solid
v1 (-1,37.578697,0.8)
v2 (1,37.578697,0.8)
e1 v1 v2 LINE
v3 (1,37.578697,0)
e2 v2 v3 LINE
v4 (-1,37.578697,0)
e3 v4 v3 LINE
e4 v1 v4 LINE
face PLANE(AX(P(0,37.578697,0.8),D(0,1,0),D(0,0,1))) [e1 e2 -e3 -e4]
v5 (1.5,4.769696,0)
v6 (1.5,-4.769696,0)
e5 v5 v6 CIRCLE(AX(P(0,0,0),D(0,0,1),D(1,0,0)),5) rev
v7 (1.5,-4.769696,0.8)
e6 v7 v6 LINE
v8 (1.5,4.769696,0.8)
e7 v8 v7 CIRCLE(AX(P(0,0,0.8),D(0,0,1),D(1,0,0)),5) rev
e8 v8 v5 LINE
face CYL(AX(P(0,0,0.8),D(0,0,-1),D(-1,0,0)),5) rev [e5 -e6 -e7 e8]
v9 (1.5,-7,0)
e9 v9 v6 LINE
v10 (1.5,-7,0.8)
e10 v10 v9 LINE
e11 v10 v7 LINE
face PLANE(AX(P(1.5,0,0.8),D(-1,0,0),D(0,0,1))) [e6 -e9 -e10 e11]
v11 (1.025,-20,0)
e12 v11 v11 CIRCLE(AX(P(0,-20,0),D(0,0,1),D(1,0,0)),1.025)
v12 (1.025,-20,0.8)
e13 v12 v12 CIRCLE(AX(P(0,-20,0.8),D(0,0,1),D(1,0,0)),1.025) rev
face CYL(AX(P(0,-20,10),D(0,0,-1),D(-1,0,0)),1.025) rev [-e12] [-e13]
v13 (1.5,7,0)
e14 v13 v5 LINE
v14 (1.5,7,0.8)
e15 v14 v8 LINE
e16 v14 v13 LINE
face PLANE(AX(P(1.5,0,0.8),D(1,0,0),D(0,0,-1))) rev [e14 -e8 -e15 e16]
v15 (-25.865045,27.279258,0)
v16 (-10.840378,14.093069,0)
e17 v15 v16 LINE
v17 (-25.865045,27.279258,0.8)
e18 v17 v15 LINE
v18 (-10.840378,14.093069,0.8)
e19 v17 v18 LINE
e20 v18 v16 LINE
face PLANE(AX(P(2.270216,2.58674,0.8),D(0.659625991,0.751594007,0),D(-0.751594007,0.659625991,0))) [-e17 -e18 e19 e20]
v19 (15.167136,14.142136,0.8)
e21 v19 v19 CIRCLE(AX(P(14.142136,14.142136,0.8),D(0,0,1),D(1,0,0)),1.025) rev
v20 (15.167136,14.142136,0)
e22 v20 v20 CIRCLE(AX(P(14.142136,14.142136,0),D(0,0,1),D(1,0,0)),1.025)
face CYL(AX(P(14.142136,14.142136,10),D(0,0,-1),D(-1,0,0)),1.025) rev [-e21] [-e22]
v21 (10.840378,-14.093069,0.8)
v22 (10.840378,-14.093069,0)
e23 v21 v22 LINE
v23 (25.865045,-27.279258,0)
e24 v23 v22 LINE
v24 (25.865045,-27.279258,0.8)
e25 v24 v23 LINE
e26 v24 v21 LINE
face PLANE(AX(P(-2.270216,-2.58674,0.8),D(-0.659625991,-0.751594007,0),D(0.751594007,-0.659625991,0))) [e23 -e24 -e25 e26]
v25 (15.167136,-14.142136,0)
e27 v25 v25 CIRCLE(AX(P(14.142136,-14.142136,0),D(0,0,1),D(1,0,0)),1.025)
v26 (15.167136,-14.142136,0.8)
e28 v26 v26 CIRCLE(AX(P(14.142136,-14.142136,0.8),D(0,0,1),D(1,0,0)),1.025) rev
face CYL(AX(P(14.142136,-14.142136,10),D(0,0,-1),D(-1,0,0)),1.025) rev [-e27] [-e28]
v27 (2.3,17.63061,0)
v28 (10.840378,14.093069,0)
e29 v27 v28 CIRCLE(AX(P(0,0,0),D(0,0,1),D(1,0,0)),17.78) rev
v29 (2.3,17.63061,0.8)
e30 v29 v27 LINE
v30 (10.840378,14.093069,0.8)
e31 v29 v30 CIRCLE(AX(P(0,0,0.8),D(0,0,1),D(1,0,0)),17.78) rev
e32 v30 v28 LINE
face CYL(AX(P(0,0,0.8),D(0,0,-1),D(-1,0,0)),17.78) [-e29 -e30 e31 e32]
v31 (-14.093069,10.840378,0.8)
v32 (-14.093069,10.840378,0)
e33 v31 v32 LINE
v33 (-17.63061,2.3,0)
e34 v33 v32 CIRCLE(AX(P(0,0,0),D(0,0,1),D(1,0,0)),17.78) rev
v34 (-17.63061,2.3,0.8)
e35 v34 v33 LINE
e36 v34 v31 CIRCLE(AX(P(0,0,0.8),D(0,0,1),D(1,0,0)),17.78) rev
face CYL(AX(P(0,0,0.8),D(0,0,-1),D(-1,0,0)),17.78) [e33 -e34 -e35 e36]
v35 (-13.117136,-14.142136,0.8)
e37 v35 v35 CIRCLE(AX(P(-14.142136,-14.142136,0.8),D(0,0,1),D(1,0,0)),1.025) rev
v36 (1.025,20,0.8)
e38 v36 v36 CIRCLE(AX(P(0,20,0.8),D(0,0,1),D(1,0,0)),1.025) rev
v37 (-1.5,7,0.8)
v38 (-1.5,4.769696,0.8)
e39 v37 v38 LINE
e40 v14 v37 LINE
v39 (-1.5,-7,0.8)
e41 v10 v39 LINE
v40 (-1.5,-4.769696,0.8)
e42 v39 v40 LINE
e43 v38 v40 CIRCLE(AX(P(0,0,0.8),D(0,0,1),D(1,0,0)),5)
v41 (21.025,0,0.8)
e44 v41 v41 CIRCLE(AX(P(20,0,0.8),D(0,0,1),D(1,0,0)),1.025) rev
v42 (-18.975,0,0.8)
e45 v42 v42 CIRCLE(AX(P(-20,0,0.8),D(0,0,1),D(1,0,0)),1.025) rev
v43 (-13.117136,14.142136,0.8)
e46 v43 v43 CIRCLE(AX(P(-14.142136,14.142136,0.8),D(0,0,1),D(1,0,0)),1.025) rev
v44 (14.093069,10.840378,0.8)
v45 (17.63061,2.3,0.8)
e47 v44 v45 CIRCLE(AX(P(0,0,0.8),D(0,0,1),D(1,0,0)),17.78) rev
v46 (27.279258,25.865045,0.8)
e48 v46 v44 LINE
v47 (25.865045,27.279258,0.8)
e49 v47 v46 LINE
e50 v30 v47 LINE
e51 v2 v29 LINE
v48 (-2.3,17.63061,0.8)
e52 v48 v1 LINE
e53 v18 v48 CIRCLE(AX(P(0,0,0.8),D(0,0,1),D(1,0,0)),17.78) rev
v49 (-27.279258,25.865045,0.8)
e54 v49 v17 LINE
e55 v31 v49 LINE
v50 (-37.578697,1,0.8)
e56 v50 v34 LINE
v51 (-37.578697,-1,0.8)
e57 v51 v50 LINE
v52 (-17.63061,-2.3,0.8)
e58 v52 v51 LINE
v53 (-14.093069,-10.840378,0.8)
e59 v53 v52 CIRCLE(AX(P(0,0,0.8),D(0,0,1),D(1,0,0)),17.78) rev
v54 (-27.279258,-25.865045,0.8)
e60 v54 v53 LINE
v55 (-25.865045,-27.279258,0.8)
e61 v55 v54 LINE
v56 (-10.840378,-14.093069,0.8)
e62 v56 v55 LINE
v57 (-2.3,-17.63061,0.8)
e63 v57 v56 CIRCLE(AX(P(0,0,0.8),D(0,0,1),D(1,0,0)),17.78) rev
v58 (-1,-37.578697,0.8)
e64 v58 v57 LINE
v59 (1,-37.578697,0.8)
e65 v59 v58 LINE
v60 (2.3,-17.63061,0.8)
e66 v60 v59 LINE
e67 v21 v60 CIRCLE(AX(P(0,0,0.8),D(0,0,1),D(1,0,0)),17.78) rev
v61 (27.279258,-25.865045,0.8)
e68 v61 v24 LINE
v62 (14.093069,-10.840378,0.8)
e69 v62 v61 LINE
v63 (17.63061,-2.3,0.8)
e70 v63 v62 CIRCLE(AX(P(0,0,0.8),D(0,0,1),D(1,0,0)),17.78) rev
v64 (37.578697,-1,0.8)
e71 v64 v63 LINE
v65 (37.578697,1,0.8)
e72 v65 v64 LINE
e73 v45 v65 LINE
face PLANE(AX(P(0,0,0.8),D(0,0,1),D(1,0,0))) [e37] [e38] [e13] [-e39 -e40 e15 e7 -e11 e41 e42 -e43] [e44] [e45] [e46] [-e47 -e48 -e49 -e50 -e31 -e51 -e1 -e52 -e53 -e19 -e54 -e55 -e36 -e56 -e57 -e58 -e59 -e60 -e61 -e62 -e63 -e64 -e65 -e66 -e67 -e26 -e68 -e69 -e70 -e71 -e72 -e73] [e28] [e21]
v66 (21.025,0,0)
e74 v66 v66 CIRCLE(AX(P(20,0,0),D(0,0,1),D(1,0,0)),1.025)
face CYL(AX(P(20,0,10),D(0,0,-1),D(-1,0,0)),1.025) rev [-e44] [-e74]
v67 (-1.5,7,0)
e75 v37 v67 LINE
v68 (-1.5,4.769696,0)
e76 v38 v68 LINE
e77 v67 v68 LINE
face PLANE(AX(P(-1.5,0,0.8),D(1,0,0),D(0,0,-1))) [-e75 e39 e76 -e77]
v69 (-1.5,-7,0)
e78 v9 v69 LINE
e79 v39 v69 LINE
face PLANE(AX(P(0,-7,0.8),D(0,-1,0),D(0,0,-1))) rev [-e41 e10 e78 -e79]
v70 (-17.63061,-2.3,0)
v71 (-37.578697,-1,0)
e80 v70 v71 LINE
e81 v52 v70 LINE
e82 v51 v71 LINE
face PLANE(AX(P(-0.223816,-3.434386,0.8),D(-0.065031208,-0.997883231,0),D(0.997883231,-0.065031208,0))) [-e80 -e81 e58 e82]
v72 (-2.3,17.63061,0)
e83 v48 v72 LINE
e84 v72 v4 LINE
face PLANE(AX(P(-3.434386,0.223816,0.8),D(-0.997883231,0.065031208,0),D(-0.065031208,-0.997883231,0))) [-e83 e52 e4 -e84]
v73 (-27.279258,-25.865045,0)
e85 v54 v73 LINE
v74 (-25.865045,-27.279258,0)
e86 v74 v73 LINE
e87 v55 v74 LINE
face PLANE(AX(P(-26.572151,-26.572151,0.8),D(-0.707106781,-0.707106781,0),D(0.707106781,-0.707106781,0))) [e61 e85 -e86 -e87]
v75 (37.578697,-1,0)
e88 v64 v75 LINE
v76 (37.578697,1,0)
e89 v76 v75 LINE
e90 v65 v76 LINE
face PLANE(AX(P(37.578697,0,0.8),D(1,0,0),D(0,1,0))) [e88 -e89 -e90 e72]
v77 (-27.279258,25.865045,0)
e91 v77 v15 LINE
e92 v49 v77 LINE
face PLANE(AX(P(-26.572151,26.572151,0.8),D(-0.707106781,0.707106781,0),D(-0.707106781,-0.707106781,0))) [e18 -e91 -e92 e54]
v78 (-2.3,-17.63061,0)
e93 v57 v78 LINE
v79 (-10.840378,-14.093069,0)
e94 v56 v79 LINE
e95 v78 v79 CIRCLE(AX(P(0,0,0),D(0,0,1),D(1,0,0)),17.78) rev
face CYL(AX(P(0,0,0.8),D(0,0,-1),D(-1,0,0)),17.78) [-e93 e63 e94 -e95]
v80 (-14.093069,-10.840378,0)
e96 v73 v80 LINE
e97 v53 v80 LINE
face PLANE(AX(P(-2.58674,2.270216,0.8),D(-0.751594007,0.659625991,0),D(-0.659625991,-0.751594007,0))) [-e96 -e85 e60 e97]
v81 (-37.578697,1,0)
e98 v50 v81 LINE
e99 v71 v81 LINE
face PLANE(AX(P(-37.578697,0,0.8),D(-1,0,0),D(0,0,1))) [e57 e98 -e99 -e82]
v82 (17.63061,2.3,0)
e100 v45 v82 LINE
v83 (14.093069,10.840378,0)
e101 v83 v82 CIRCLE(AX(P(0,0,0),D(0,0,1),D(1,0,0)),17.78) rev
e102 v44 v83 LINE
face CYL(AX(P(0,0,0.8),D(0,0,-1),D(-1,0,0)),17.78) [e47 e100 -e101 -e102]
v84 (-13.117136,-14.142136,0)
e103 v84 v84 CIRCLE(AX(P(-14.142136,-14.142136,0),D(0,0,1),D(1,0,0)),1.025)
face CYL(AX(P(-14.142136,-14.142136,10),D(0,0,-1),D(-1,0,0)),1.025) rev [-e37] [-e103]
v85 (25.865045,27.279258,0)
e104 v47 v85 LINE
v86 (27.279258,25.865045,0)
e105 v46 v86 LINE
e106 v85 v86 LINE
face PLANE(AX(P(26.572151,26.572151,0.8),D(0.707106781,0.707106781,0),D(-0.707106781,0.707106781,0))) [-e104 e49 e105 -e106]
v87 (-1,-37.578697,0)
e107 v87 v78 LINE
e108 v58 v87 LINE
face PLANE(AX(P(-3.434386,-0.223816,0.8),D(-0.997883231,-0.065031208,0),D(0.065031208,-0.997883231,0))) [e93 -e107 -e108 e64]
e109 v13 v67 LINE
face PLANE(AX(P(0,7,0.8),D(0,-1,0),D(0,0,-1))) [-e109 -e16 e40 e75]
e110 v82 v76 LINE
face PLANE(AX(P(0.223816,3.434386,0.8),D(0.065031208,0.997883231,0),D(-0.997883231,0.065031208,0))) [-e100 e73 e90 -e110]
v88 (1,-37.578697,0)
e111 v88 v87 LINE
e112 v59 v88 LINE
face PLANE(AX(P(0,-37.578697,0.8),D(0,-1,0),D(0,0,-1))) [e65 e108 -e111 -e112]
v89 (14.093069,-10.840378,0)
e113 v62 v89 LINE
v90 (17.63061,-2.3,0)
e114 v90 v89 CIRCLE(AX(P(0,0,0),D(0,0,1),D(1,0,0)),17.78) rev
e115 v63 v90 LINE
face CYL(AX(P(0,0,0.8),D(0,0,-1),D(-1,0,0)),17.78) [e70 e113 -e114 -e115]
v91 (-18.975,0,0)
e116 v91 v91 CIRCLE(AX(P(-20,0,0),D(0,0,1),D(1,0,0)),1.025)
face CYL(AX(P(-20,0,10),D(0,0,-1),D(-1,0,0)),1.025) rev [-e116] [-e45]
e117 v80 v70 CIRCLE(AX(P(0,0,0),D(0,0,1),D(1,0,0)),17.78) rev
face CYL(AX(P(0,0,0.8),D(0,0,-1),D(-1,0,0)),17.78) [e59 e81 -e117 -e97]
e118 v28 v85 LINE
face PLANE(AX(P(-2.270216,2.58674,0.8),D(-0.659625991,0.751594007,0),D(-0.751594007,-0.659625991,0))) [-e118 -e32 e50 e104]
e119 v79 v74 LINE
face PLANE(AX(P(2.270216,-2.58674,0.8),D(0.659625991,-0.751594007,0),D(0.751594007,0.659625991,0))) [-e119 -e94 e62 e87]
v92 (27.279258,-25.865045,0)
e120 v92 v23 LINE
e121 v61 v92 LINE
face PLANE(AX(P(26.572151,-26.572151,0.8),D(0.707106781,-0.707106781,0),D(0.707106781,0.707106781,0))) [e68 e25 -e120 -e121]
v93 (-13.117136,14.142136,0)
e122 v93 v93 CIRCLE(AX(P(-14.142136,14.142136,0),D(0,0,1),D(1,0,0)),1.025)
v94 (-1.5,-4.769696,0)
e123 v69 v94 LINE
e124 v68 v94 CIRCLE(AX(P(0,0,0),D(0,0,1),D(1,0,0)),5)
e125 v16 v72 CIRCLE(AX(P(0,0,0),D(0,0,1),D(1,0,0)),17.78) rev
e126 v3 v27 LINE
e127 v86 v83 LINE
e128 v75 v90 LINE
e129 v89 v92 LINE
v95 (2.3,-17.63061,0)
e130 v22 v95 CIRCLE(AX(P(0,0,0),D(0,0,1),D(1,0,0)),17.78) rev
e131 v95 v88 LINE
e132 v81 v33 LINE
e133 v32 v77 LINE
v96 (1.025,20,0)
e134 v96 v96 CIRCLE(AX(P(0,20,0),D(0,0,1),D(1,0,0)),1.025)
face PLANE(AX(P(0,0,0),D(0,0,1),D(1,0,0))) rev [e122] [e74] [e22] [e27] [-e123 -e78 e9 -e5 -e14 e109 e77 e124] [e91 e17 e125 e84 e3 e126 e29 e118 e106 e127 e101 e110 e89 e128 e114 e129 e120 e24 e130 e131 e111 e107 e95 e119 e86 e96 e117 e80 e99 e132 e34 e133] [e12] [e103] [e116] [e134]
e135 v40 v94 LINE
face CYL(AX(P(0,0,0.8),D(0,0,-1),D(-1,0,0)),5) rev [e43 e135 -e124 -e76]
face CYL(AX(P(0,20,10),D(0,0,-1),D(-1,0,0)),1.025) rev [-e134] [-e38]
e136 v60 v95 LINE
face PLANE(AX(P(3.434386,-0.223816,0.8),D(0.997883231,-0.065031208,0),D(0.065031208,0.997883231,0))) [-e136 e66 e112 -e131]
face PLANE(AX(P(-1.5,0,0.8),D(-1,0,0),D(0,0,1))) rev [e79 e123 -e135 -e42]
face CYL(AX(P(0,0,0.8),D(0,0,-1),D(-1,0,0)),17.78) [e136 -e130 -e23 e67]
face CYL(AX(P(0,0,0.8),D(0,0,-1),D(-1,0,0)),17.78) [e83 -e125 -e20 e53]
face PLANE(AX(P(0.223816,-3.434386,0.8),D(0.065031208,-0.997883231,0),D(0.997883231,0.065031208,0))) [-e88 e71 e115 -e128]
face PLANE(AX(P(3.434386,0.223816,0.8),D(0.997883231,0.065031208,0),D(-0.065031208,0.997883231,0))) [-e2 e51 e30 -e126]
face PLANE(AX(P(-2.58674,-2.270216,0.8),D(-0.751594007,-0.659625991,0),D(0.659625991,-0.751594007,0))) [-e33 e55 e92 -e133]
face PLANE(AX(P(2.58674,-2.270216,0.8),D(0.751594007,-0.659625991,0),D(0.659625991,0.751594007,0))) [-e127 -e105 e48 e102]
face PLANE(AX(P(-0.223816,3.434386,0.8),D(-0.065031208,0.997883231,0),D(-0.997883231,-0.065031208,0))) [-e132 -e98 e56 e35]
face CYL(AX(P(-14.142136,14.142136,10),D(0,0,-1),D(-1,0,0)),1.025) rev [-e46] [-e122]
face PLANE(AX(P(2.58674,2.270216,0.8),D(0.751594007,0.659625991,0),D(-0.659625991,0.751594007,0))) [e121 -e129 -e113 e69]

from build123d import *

# Parameters (mm, degrees)
BOSS_EXTRUDE1_DEPTH = 0.8
SKETCH2_R           = 1.025
CUT_EXTRUDE2_DEPTH  = 10


# Read off the part's stored shape, not the designer's step: Boss-Extrude1
with BuildPart() as part:
    # Boss-Extrude1 outline → Boss-Extrude1 (new body)
    with BuildSketch(Plane.XY):
        with BuildLine():
            ThreePointArc((-2.3, 17.630609746), (-6.804111427, 16.426578088), (-10.840378111, 14.093069304))
            Line((-10.840378111, 14.093069304), (-25.865044656, 27.279258218))
            Line((-25.865044656, 27.279258218), (-27.279258218, 25.865044656))
            Line((-27.279258218, 25.865044656), (-14.093069304, 10.840378111))
            ThreePointArc((-14.093069304, 10.840378111), (-16.426578088, 6.804111427), (-17.630609746, 2.3))
            Line((-17.630609746, 2.3), (-37.578696944, 1))
            Line((-37.578696944, 1), (-37.578696944, -1))
            Line((-37.578696944, -1), (-17.630609746, -2.3))
            ThreePointArc((-17.630609746, -2.3), (-16.426578088, -6.804111427), (-14.093069304, -10.840378111))
            Line((-14.093069304, -10.840378111), (-27.279258218, -25.865044656))
            Line((-27.279258218, -25.865044656), (-25.865044656, -27.279258218))
            Line((-25.865044656, -27.279258218), (-10.840378111, -14.093069304))
            ThreePointArc((-10.840378111, -14.093069304), (-6.804111427, -16.426578088), (-2.3, -17.630609746))
            Line((-2.3, -17.630609746), (-1, -37.578696944))
            Line((-1, -37.578696944), (1, -37.578696944))
            Line((1, -37.578696944), (2.3, -17.630609746))
            ThreePointArc((2.3, -17.630609746), (6.804111427, -16.426578088), (10.840378111, -14.093069304))
            Line((10.840378111, -14.093069304), (25.865044656, -27.279258218))
            Line((25.865044656, -27.279258218), (27.279258218, -25.865044656))
            Line((27.279258218, -25.865044656), (14.093069304, -10.840378111))
            ThreePointArc((14.093069304, -10.840378111), (16.426578088, -6.804111427), (17.630609746, -2.3))
            Line((17.630609746, -2.3), (37.578696944, -1))
            Line((37.578696944, -1), (37.578696944, 1))
            Line((37.578696944, 1), (17.630609746, 2.3))
            ThreePointArc((17.630609746, 2.3), (16.426578088, 6.804111427), (14.093069304, 10.840378111))
            Line((14.093069304, 10.840378111), (27.279258218, 25.865044656))
            Line((27.279258218, 25.865044656), (25.865044656, 27.279258218))
            Line((25.865044656, 27.279258218), (10.840378111, 14.093069304))
            ThreePointArc((10.840378111, 14.093069304), (6.804111427, 16.426578088), (2.3, 17.630609746))
            Line((2.3, 17.630609746), (1, 37.578696944))
            Line((1, 37.578696944), (-1, 37.578696944))
            Line((-1, 37.578696944), (-2.3, 17.630609746))
        make_face()
        with BuildLine():
            Line((-1.5, -7), (-1.5, -4.769696007))
            ThreePointArc((-1.5, -4.769696007), (-5, 0), (-1.5, 4.769696007))
            Line((-1.5, 4.769696007), (-1.5, 7))
            Line((-1.5, 7), (1.5, 7))
            Line((1.5, 7), (1.5, 4.769696007))
            ThreePointArc((1.5, 4.769696007), (5, 0), (1.5, -4.769696007))
            Line((1.5, -4.769696007), (1.5, -7))
            Line((1.5, -7), (-1.5, -7))
        make_face(mode=Mode.SUBTRACT)
    extrude(amount=BOSS_EXTRUDE1_DEPTH)

    # Sketch2 → Cut-Extrude2 (cut)
    with BuildSketch(Plane.XY):
        with Locations((0, 20)):
            Circle(SKETCH2_R)
        with Locations((14.142135624, 14.142135624)):
            Circle(SKETCH2_R)
        with Locations((20, 0)):
            Circle(SKETCH2_R)
        with Locations((14.142135624, -14.142135624)):
            Circle(SKETCH2_R)
        with Locations((0, -20)):
            Circle(SKETCH2_R)
        with Locations((-14.142135624, -14.142135624)):
            Circle(SKETCH2_R)
        with Locations((-20, 0)):
            Circle(SKETCH2_R)
        with Locations((-14.142135624, 14.142135624)):
            Circle(SKETCH2_R)
    extrude(amount=CUT_EXTRUDE2_DEPTH, mode=Mode.SUBTRACT)


solid = part.part
